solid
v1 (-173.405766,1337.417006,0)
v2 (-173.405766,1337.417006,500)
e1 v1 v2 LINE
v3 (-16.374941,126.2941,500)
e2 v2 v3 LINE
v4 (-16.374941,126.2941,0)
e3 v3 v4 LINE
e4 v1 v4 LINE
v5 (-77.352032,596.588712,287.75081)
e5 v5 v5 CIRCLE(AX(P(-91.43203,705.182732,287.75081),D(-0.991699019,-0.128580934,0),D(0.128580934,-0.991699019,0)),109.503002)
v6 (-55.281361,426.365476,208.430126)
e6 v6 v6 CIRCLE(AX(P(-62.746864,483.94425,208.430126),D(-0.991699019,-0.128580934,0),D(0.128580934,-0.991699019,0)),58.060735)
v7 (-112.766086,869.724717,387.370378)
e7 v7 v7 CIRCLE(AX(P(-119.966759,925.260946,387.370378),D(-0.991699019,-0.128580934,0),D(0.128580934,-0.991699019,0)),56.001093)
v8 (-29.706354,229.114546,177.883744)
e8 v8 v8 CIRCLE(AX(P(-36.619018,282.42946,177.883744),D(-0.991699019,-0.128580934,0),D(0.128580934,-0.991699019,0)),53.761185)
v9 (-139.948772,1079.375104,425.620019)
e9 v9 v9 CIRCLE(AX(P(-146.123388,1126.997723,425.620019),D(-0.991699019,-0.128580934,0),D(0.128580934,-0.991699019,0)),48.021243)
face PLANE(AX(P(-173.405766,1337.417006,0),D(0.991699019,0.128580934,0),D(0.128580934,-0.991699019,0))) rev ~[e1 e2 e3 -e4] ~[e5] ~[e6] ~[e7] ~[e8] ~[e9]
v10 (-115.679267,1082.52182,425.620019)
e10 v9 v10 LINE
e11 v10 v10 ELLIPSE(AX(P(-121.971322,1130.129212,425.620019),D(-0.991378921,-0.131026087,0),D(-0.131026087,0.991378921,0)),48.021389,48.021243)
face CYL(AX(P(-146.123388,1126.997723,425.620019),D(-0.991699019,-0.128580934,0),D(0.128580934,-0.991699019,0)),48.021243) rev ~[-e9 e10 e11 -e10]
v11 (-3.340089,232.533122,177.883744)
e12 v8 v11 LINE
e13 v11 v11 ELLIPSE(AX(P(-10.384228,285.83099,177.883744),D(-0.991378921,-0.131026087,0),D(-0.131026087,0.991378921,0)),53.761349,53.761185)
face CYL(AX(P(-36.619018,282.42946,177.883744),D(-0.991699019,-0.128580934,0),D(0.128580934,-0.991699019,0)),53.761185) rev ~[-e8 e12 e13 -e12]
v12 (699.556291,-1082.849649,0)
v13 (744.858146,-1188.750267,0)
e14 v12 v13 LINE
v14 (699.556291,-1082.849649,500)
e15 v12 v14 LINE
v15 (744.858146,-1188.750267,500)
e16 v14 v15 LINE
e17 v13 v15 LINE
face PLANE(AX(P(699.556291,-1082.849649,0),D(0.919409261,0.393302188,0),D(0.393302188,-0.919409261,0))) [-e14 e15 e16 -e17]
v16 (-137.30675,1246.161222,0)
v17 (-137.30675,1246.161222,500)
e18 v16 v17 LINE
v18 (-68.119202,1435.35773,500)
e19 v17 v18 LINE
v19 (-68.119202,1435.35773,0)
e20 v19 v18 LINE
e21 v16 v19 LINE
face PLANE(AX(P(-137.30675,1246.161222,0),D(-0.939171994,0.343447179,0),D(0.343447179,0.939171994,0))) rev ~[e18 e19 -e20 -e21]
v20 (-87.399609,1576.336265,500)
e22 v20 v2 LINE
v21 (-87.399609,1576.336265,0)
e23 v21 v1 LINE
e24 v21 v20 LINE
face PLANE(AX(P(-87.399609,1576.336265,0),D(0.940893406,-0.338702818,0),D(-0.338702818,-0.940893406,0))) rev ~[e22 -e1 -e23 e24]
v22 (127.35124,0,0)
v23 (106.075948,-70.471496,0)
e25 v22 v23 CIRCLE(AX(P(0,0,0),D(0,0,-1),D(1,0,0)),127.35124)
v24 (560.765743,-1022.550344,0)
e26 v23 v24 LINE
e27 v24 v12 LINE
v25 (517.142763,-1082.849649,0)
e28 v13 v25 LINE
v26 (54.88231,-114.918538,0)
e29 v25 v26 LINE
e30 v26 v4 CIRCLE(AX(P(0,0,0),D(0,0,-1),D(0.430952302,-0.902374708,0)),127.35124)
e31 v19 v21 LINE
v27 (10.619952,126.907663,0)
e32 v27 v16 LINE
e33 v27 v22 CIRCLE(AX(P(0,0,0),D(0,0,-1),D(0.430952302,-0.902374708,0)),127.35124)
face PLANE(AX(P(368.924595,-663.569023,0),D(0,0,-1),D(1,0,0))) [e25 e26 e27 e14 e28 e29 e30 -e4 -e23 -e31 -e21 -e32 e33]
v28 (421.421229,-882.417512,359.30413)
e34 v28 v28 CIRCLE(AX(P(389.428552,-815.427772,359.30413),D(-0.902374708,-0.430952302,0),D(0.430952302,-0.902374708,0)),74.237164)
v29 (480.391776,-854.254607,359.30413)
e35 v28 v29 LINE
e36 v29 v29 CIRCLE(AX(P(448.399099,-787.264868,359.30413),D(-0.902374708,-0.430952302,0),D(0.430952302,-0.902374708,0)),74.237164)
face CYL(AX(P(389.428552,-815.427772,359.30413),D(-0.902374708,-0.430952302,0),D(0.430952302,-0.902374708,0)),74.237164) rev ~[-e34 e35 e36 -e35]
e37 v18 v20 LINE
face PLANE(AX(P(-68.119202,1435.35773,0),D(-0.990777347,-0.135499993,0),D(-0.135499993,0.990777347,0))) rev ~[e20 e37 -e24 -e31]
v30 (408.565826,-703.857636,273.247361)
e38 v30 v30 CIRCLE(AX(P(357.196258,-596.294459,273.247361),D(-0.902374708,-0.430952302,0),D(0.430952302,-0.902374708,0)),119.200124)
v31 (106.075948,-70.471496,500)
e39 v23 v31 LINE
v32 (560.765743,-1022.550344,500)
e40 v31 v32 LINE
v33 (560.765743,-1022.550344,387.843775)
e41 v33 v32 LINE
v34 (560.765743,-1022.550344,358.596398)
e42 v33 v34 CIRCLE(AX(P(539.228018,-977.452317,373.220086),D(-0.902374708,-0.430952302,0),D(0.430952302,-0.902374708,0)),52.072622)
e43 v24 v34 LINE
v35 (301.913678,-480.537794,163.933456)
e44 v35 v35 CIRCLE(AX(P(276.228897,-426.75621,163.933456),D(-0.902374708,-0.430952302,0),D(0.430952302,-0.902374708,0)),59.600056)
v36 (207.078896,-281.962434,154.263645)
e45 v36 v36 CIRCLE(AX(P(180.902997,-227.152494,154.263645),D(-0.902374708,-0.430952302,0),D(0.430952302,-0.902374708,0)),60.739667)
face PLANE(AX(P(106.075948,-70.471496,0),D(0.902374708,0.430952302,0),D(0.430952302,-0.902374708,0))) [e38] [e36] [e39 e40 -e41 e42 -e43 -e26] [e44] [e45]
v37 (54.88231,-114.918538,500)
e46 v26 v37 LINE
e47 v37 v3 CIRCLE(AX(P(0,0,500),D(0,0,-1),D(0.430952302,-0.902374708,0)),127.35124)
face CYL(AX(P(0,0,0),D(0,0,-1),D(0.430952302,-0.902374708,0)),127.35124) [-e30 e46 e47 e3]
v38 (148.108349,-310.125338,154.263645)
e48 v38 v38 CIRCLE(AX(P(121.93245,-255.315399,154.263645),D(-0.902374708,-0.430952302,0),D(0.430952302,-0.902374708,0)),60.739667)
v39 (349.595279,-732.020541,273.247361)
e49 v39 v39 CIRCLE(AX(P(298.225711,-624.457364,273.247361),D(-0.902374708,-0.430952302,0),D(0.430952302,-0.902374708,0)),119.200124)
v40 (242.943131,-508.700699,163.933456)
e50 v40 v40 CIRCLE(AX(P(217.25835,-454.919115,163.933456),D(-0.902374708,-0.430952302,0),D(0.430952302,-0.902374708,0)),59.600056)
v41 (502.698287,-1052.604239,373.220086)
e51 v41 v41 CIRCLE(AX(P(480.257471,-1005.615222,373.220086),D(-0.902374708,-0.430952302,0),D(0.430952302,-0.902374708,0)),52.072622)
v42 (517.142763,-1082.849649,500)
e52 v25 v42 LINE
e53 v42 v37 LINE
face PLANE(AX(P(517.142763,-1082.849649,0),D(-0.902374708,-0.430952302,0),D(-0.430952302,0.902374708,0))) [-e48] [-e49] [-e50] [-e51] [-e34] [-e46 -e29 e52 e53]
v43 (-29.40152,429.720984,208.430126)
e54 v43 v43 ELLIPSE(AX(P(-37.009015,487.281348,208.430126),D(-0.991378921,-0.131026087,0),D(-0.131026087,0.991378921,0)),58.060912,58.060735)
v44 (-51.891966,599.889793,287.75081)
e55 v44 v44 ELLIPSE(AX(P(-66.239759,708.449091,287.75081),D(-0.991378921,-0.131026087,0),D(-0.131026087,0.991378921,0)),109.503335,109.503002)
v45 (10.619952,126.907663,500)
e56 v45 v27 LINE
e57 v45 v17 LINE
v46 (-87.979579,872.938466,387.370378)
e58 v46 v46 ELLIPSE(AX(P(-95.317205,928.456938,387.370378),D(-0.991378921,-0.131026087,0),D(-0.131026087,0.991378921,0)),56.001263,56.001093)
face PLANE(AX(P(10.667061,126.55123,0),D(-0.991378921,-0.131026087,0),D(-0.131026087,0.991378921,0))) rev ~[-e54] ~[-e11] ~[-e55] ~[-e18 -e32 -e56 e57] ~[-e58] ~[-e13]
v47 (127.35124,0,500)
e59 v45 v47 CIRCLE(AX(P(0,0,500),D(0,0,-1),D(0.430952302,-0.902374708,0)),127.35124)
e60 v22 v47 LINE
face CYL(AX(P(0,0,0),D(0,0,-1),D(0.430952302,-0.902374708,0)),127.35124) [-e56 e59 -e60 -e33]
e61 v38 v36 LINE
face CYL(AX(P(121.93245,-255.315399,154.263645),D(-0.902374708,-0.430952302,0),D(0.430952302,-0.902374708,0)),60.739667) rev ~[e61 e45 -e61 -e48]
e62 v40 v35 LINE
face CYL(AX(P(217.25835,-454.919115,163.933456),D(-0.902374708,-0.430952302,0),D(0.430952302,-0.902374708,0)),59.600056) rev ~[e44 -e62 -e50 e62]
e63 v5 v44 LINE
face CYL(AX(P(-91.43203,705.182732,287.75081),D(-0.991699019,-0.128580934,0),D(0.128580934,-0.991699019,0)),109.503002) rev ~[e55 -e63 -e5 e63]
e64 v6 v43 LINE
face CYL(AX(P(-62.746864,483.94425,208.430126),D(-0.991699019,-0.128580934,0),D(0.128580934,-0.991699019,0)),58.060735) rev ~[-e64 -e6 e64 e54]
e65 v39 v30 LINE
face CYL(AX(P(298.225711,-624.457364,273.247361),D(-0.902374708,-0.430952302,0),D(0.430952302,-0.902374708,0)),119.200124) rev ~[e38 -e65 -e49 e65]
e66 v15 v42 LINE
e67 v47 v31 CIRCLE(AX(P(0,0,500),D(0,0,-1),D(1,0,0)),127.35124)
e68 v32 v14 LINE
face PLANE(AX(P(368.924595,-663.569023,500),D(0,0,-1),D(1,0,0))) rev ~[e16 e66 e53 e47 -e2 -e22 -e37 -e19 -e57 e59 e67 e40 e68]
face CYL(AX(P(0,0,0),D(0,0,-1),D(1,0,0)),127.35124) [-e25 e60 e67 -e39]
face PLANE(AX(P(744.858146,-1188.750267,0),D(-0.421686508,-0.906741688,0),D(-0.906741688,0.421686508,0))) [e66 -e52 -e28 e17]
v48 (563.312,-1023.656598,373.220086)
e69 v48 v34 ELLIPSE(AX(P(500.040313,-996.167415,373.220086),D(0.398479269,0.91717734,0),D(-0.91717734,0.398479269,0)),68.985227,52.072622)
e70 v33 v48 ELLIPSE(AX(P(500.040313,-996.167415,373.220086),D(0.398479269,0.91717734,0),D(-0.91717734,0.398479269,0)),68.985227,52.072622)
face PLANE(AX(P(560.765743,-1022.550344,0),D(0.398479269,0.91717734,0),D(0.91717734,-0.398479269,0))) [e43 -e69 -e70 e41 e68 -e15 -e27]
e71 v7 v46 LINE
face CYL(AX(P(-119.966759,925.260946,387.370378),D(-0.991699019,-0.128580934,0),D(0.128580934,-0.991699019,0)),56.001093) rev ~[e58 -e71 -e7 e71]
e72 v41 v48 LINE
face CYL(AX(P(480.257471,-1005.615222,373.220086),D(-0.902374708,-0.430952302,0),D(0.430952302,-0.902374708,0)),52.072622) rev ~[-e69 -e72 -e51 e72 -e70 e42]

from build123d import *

# Parameters (mm, degrees)
F1_DEPTH = 500
F2_R     = 48.0212425181
F2_R_2   = 56.0010929185
F2_R_3   = 109.5030020502
F2_R_4   = 58.0607354524
F2_R_5   = 53.7611851769
F3_DEPTH = 50
F5_DEPTH = 500
F6_R     = 60.7396670844
F6_R_2   = 74.2371640954
F6_R_3   = 52.0726222856
F6_R_4   = 59.6000564376
F6_R_5   = 119.2001237969
F7_DEPTH = 100


# Not quite as in the source:
# - a feature names something its author has since deleted; it is built from what else it names


with BuildPart() as f1:
    # F0 (on Top) → F1 (new body)
    with BuildSketch(Plane.XY):
        with BuildLine():
            ThreePointArc((-16.3297786736, 125.9457753498), (-2.847496792, 126.9680737903), (10.6670605483, 126.5512300187))
            Line((10.6670605483, 126.5512300187), (-137.3067498207, 1246.1612224579))
            Line((-137.3067498207, 1246.1612224579), (-68.1192024335, 1435.3577301921))
            Line((-68.1192024335, 1435.3577301921), (-87.3996093869, 1576.3362646103))
            Line((-87.3996093869, 1576.3362646103), (-173.4057664871, 1337.4170064926))
            Line((-173.4057664871, 1337.4170064926), (-16.3297786736, 125.9457753498))
        make_face()
        with BuildLine():
            ThreePointArc((-16.3297786736, 125.9457753498), (-83.8305377188, -95.4014724508), (127, 0))
            ThreePointArc((127, 0), (93.4979055638, 85.9484825647), (10.6670605483, 126.5512300187))
            ThreePointArc((10.6670605483, 126.5512300187), (-2.847496792, 126.9680737903), (-16.3297786736, 125.9457753498))
        make_face()
    extrude(amount=F1_DEPTH)

    # F2 (on face) → F3 (cut)
    with BuildSketch(Plane(origin=(0, 0, 0), x_dir=(0.1285809344, -0.9916990185, 0), z_dir=(-0.9916990185, -0.1285809344, 0))):
        with Locations((-1136.4312171936, 425.6200194359)):
            Circle(F2_R)
        with Locations((-933.0058097839, 387.370377779)):
            Circle(F2_R_2)
        with Locations((-711.0854387283, 287.7508103848)):
            Circle(F2_R_3)
        with Locations((-487.9950881004, 208.4301263094)):
            Circle(F2_R_4)
        with Locations((-284.7935259342, 177.8837442398)):
            Circle(F2_R_5)
    extrude(amount=-F3_DEPTH, mode=Mode.SUBTRACT)

    # F4 (on face) → F5 (join)
    with BuildSketch(Plane(origin=(0, 0, 0), x_dir=(1, 0, 0), z_dir=(0, 0, -1))):
        with BuildLine():
            Line((517.1427625415, 1082.8496493747), (54.8823102258, 114.918538341))
            ThreePointArc((54.8823102258, 114.918538341), (83.4911676886, 96.1642519242), (106.0759476154, 70.4714961361))
            Line((106.0759476154, 70.4714961361), (560.7657432556, 1022.5503444672))
            Line((560.7657432556, 1022.5503444672), (699.5562911034, 1082.8496493747))
            Line((699.5562911034, 1082.8496493747), (744.8581457138, 1188.7502670288))
            Line((744.8581457138, 1188.7502670288), (517.1427625415, 1082.8496493747))
        make_face()
        with BuildLine():
            ThreePointArc((106.0759476154, 70.4714961361), (83.4911676886, 96.1642519242), (54.8823102258, 114.918538341))
            ThreePointArc((54.8823102258, 114.918538341), (-107.7210952255, -67.9301411273), (127.3512403951, 0))
            ThreePointArc((127.3512403951, 0), (121.9164507666, 36.8064866923), (106.0759476154, 70.4714961361))
        make_face()
    extrude(amount=-F5_DEPTH)

    # F6 (on face) → F7 (cut)
    with BuildSketch(Plane(origin=(0, 0, 0), x_dir=(0.4309523021, -0.9023747078, 0), z_dir=(-0.9023747078, -0.4309523021, 0))):
        with Locations((282.9372286797, 154.2636454105)):
            Circle(F6_R)
        with Locations((903.6465287209, 359.3041300774)):
            Circle(F6_R_2)
        with Locations((1114.4098043442, 373.2200860977)):
            Circle(F6_R_3)
        with Locations((504.1354894638, 163.9334559441)):
            Circle(F6_R_4)
        with Locations((692.0155882835, 273.2473611832)):
            Circle(F6_R_5)
    extrude(amount=-F7_DEPTH, mode=Mode.SUBTRACT)


solid = f1.part
